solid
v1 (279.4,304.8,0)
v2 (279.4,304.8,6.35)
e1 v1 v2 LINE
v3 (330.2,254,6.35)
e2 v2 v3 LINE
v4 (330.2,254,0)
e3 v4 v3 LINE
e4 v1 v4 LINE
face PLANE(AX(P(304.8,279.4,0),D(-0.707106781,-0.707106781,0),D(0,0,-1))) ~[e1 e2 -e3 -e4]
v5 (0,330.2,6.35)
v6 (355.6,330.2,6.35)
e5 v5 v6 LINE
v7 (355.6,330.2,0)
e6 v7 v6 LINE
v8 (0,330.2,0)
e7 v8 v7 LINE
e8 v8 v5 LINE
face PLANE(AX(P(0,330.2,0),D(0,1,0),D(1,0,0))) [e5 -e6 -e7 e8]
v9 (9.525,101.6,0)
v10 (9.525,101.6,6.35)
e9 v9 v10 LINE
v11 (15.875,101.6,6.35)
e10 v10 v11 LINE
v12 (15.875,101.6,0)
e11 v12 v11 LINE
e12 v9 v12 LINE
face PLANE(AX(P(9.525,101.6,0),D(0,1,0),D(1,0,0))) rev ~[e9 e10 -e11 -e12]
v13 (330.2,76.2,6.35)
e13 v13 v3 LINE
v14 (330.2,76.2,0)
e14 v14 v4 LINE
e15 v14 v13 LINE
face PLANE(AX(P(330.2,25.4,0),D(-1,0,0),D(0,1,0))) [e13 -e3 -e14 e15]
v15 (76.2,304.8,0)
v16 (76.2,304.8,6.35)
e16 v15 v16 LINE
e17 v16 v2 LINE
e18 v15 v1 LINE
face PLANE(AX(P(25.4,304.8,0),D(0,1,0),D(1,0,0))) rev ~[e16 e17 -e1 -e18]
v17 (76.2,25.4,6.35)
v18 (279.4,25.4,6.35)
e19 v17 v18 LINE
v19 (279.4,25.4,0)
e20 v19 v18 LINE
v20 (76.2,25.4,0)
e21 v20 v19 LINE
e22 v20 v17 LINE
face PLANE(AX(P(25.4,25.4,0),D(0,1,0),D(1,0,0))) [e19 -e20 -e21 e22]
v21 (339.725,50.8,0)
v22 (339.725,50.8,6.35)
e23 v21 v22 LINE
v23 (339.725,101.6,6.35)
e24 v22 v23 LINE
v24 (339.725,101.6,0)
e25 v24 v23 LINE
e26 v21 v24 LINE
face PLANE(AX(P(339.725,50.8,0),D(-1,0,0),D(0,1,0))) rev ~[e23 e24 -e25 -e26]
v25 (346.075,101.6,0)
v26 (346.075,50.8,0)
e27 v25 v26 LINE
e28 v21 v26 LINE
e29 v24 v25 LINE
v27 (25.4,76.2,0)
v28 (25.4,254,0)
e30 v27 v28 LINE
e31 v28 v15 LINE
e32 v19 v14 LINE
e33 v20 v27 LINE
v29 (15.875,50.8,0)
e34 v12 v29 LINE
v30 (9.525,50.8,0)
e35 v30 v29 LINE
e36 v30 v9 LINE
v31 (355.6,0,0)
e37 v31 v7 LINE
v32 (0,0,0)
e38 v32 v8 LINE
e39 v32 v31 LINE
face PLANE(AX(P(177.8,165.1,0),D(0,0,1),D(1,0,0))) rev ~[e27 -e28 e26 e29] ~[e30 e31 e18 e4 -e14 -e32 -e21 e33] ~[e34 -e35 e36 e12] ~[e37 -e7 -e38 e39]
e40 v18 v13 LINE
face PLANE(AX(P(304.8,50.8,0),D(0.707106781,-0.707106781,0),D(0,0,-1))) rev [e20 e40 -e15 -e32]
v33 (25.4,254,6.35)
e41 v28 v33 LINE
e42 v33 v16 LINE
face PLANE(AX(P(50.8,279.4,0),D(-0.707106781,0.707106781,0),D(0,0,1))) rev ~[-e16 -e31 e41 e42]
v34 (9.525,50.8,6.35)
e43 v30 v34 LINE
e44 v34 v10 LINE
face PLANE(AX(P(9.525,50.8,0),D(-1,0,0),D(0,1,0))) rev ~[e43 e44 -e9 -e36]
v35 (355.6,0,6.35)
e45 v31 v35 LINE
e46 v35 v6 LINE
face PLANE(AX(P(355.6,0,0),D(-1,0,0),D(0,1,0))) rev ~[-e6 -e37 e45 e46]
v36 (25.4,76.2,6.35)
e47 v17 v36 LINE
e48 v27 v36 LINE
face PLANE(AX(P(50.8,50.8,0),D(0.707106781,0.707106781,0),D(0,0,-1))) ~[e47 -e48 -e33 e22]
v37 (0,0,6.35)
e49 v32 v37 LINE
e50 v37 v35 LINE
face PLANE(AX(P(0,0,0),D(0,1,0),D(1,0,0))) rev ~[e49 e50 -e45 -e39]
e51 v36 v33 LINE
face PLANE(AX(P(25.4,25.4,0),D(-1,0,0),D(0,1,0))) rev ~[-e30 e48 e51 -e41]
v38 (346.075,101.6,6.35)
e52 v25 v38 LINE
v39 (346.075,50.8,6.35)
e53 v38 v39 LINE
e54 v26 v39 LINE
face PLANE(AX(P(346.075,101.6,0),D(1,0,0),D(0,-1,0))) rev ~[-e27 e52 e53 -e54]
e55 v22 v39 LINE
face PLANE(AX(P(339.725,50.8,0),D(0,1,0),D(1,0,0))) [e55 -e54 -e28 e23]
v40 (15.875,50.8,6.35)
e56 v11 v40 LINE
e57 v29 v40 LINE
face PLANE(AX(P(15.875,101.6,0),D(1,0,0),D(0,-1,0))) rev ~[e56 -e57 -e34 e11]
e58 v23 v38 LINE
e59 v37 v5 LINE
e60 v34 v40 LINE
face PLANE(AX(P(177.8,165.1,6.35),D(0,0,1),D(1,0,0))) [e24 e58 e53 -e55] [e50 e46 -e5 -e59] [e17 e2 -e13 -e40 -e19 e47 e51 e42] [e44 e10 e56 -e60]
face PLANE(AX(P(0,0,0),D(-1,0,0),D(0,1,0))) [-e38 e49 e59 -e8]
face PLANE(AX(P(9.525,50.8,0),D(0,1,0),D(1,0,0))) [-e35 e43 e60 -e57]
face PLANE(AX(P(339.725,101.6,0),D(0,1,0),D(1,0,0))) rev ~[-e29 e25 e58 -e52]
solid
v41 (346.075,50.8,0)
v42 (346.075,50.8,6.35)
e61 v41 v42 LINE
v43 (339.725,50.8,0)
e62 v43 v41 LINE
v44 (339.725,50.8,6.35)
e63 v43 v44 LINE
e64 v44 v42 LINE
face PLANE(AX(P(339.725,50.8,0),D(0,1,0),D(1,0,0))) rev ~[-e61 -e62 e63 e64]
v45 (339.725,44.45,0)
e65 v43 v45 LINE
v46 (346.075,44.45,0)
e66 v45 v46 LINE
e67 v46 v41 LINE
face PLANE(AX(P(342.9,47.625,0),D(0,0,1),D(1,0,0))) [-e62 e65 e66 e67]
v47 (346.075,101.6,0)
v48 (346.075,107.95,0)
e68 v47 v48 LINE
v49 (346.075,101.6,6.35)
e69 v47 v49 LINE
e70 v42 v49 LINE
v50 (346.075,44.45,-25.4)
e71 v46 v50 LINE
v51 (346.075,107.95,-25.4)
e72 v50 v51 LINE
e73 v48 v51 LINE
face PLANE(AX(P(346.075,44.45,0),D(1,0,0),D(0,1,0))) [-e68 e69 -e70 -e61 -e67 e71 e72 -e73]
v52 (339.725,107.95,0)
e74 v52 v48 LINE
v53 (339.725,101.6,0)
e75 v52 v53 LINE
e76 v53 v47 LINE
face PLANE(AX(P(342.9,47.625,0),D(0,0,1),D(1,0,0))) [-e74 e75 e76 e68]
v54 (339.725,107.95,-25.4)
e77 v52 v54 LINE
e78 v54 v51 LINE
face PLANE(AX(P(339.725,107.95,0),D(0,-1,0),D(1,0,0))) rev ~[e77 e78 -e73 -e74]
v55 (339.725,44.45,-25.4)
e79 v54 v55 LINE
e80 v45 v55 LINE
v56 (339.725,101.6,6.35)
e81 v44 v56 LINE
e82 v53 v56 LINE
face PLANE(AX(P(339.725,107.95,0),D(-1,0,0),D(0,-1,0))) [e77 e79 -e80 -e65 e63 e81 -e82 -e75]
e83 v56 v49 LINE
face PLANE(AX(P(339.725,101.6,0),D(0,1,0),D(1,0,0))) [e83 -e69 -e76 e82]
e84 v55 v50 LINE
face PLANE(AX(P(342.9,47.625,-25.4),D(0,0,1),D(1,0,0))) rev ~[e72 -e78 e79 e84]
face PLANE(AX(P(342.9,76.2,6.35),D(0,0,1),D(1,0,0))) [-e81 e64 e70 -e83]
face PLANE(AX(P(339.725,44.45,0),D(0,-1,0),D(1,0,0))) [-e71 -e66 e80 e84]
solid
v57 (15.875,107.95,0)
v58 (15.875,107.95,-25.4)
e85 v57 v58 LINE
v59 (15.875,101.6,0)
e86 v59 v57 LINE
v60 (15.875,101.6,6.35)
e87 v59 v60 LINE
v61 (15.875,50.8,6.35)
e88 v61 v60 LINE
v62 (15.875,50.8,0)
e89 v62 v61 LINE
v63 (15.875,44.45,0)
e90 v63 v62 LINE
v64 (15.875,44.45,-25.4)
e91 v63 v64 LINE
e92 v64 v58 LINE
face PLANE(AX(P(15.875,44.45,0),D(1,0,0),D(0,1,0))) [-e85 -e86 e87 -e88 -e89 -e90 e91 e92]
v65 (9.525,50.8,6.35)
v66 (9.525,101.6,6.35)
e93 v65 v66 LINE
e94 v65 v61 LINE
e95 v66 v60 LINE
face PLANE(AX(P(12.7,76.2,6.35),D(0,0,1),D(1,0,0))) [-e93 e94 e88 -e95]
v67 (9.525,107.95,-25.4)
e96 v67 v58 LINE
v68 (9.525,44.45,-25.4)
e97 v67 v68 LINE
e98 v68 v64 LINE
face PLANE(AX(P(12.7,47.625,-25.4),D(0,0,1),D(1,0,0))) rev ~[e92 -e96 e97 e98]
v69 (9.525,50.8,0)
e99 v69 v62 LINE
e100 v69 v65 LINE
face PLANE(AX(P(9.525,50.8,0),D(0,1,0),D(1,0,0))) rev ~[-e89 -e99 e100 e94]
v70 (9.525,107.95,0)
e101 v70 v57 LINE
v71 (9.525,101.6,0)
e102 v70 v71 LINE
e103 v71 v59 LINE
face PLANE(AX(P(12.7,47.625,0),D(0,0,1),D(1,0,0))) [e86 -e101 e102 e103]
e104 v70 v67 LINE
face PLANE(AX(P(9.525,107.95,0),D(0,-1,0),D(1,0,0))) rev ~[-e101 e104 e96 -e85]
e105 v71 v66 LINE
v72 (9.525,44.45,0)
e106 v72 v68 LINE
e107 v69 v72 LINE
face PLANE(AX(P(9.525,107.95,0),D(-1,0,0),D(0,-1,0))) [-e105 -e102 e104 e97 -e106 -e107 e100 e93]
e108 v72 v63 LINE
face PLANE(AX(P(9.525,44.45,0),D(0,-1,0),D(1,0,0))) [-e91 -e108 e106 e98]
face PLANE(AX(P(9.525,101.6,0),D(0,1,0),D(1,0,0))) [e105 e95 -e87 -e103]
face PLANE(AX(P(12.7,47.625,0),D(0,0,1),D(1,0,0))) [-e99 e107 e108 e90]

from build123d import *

# Parameters (mm, degrees)
F0_W     = 355.6
F0_H     = 330.2
F0_W_2   = 304.8
F0_H_2   = 279.4
F0_W_3   = 6.35
F0_H_3   = 6.35
F1_DEPTH = 6.35
F2_SIZE  = 50.8
F0_H_4   = 50.8
F3_DEPTH = 6.35
F4_DEPTH = 25.4


with BuildPart() as f1:
    # F0 (on Top) → F1 (new body)
    with BuildSketch(Plane.XY):
        with Locations((177.8, 165.1)):
            Rectangle(F0_W, F0_H)
        Polygon((9.525, 44.45), (9.525, 50.8), (9.525, 101.6), (9.525, 107.95), (15.875, 107.95), (15.875, 101.6), (15.875, 50.8), (15.875, 44.45), align=None, mode=Mode.SUBTRACT)
        Polygon((346.075, 101.6), (346.075, 50.8), (346.075, 44.45), (339.725, 44.45), (339.725, 50.8), (339.725, 101.6), (339.725, 107.95), (346.075, 107.95), align=None, mode=Mode.SUBTRACT)
        with Locations((177.8, 165.1)):
            Rectangle(F0_W_2, F0_H_2, mode=Mode.SUBTRACT)
        with Locations((12.7, 47.625)):
            Rectangle(F0_W_3, F0_H_3)
        with Locations((342.9, 47.625)):
            Rectangle(F0_W_3, F0_H_3)
        with Locations((342.9, 104.775)):
            Rectangle(F0_W_3, F0_H_3)
        with Locations((12.7, 104.775)):
            Rectangle(F0_W_3, F0_H_3)
    extrude(amount=F1_DEPTH)

    # F2
    f2_edges = [f1.edges().sort_by_distance(p)[0] for p in [
        (25.4, 304.8, 3.175),
        (25.4, 25.4, 3.175),
        (330.2, 25.4, 3.175),
        (330.2, 304.8, 3.175),
    ]]
    chamfer(f2_edges, length=F2_SIZE)


with BuildPart() as f3:
    # F0 (on Top) → F3 (new body, through all)
    with BuildSketch(Plane.XY):
        with Locations((12.7, 76.2)):
            Rectangle(F0_W_3, F0_H_4)
    extrude(amount=F3_DEPTH)

    # F0 (on Top) → F4 (join)
    with BuildSketch(Plane.XY):
        with Locations((12.7, 47.625)):
            Rectangle(F0_W_3, F0_H_3)
        with Locations((12.7, 76.2)):
            Rectangle(F0_W_3, F0_H_4)
        with Locations((12.7, 104.775)):
            Rectangle(F0_W_3, F0_H_3)
    extrude(amount=-F4_DEPTH)


with BuildPart() as f3b:
    # F0 (on Top) → F3, piece 2 (new body, through all)
    with BuildSketch(Plane.XY):
        with Locations((342.9, 76.2)):
            Rectangle(F0_W_3, F0_H_4)
    extrude(amount=F3_DEPTH)

    # F0 (on Top) → F4, piece 2 (join)
    with BuildSketch(Plane.XY):
        with Locations((342.9, 47.625)):
            Rectangle(F0_W_3, F0_H_3)
        with Locations((342.9, 76.2)):
            Rectangle(F0_W_3, F0_H_4)
        with Locations((342.9, 104.775)):
            Rectangle(F0_W_3, F0_H_3)
    extrude(amount=-F4_DEPTH)


solid = Compound([f1.part, f3.part, f3b.part])
